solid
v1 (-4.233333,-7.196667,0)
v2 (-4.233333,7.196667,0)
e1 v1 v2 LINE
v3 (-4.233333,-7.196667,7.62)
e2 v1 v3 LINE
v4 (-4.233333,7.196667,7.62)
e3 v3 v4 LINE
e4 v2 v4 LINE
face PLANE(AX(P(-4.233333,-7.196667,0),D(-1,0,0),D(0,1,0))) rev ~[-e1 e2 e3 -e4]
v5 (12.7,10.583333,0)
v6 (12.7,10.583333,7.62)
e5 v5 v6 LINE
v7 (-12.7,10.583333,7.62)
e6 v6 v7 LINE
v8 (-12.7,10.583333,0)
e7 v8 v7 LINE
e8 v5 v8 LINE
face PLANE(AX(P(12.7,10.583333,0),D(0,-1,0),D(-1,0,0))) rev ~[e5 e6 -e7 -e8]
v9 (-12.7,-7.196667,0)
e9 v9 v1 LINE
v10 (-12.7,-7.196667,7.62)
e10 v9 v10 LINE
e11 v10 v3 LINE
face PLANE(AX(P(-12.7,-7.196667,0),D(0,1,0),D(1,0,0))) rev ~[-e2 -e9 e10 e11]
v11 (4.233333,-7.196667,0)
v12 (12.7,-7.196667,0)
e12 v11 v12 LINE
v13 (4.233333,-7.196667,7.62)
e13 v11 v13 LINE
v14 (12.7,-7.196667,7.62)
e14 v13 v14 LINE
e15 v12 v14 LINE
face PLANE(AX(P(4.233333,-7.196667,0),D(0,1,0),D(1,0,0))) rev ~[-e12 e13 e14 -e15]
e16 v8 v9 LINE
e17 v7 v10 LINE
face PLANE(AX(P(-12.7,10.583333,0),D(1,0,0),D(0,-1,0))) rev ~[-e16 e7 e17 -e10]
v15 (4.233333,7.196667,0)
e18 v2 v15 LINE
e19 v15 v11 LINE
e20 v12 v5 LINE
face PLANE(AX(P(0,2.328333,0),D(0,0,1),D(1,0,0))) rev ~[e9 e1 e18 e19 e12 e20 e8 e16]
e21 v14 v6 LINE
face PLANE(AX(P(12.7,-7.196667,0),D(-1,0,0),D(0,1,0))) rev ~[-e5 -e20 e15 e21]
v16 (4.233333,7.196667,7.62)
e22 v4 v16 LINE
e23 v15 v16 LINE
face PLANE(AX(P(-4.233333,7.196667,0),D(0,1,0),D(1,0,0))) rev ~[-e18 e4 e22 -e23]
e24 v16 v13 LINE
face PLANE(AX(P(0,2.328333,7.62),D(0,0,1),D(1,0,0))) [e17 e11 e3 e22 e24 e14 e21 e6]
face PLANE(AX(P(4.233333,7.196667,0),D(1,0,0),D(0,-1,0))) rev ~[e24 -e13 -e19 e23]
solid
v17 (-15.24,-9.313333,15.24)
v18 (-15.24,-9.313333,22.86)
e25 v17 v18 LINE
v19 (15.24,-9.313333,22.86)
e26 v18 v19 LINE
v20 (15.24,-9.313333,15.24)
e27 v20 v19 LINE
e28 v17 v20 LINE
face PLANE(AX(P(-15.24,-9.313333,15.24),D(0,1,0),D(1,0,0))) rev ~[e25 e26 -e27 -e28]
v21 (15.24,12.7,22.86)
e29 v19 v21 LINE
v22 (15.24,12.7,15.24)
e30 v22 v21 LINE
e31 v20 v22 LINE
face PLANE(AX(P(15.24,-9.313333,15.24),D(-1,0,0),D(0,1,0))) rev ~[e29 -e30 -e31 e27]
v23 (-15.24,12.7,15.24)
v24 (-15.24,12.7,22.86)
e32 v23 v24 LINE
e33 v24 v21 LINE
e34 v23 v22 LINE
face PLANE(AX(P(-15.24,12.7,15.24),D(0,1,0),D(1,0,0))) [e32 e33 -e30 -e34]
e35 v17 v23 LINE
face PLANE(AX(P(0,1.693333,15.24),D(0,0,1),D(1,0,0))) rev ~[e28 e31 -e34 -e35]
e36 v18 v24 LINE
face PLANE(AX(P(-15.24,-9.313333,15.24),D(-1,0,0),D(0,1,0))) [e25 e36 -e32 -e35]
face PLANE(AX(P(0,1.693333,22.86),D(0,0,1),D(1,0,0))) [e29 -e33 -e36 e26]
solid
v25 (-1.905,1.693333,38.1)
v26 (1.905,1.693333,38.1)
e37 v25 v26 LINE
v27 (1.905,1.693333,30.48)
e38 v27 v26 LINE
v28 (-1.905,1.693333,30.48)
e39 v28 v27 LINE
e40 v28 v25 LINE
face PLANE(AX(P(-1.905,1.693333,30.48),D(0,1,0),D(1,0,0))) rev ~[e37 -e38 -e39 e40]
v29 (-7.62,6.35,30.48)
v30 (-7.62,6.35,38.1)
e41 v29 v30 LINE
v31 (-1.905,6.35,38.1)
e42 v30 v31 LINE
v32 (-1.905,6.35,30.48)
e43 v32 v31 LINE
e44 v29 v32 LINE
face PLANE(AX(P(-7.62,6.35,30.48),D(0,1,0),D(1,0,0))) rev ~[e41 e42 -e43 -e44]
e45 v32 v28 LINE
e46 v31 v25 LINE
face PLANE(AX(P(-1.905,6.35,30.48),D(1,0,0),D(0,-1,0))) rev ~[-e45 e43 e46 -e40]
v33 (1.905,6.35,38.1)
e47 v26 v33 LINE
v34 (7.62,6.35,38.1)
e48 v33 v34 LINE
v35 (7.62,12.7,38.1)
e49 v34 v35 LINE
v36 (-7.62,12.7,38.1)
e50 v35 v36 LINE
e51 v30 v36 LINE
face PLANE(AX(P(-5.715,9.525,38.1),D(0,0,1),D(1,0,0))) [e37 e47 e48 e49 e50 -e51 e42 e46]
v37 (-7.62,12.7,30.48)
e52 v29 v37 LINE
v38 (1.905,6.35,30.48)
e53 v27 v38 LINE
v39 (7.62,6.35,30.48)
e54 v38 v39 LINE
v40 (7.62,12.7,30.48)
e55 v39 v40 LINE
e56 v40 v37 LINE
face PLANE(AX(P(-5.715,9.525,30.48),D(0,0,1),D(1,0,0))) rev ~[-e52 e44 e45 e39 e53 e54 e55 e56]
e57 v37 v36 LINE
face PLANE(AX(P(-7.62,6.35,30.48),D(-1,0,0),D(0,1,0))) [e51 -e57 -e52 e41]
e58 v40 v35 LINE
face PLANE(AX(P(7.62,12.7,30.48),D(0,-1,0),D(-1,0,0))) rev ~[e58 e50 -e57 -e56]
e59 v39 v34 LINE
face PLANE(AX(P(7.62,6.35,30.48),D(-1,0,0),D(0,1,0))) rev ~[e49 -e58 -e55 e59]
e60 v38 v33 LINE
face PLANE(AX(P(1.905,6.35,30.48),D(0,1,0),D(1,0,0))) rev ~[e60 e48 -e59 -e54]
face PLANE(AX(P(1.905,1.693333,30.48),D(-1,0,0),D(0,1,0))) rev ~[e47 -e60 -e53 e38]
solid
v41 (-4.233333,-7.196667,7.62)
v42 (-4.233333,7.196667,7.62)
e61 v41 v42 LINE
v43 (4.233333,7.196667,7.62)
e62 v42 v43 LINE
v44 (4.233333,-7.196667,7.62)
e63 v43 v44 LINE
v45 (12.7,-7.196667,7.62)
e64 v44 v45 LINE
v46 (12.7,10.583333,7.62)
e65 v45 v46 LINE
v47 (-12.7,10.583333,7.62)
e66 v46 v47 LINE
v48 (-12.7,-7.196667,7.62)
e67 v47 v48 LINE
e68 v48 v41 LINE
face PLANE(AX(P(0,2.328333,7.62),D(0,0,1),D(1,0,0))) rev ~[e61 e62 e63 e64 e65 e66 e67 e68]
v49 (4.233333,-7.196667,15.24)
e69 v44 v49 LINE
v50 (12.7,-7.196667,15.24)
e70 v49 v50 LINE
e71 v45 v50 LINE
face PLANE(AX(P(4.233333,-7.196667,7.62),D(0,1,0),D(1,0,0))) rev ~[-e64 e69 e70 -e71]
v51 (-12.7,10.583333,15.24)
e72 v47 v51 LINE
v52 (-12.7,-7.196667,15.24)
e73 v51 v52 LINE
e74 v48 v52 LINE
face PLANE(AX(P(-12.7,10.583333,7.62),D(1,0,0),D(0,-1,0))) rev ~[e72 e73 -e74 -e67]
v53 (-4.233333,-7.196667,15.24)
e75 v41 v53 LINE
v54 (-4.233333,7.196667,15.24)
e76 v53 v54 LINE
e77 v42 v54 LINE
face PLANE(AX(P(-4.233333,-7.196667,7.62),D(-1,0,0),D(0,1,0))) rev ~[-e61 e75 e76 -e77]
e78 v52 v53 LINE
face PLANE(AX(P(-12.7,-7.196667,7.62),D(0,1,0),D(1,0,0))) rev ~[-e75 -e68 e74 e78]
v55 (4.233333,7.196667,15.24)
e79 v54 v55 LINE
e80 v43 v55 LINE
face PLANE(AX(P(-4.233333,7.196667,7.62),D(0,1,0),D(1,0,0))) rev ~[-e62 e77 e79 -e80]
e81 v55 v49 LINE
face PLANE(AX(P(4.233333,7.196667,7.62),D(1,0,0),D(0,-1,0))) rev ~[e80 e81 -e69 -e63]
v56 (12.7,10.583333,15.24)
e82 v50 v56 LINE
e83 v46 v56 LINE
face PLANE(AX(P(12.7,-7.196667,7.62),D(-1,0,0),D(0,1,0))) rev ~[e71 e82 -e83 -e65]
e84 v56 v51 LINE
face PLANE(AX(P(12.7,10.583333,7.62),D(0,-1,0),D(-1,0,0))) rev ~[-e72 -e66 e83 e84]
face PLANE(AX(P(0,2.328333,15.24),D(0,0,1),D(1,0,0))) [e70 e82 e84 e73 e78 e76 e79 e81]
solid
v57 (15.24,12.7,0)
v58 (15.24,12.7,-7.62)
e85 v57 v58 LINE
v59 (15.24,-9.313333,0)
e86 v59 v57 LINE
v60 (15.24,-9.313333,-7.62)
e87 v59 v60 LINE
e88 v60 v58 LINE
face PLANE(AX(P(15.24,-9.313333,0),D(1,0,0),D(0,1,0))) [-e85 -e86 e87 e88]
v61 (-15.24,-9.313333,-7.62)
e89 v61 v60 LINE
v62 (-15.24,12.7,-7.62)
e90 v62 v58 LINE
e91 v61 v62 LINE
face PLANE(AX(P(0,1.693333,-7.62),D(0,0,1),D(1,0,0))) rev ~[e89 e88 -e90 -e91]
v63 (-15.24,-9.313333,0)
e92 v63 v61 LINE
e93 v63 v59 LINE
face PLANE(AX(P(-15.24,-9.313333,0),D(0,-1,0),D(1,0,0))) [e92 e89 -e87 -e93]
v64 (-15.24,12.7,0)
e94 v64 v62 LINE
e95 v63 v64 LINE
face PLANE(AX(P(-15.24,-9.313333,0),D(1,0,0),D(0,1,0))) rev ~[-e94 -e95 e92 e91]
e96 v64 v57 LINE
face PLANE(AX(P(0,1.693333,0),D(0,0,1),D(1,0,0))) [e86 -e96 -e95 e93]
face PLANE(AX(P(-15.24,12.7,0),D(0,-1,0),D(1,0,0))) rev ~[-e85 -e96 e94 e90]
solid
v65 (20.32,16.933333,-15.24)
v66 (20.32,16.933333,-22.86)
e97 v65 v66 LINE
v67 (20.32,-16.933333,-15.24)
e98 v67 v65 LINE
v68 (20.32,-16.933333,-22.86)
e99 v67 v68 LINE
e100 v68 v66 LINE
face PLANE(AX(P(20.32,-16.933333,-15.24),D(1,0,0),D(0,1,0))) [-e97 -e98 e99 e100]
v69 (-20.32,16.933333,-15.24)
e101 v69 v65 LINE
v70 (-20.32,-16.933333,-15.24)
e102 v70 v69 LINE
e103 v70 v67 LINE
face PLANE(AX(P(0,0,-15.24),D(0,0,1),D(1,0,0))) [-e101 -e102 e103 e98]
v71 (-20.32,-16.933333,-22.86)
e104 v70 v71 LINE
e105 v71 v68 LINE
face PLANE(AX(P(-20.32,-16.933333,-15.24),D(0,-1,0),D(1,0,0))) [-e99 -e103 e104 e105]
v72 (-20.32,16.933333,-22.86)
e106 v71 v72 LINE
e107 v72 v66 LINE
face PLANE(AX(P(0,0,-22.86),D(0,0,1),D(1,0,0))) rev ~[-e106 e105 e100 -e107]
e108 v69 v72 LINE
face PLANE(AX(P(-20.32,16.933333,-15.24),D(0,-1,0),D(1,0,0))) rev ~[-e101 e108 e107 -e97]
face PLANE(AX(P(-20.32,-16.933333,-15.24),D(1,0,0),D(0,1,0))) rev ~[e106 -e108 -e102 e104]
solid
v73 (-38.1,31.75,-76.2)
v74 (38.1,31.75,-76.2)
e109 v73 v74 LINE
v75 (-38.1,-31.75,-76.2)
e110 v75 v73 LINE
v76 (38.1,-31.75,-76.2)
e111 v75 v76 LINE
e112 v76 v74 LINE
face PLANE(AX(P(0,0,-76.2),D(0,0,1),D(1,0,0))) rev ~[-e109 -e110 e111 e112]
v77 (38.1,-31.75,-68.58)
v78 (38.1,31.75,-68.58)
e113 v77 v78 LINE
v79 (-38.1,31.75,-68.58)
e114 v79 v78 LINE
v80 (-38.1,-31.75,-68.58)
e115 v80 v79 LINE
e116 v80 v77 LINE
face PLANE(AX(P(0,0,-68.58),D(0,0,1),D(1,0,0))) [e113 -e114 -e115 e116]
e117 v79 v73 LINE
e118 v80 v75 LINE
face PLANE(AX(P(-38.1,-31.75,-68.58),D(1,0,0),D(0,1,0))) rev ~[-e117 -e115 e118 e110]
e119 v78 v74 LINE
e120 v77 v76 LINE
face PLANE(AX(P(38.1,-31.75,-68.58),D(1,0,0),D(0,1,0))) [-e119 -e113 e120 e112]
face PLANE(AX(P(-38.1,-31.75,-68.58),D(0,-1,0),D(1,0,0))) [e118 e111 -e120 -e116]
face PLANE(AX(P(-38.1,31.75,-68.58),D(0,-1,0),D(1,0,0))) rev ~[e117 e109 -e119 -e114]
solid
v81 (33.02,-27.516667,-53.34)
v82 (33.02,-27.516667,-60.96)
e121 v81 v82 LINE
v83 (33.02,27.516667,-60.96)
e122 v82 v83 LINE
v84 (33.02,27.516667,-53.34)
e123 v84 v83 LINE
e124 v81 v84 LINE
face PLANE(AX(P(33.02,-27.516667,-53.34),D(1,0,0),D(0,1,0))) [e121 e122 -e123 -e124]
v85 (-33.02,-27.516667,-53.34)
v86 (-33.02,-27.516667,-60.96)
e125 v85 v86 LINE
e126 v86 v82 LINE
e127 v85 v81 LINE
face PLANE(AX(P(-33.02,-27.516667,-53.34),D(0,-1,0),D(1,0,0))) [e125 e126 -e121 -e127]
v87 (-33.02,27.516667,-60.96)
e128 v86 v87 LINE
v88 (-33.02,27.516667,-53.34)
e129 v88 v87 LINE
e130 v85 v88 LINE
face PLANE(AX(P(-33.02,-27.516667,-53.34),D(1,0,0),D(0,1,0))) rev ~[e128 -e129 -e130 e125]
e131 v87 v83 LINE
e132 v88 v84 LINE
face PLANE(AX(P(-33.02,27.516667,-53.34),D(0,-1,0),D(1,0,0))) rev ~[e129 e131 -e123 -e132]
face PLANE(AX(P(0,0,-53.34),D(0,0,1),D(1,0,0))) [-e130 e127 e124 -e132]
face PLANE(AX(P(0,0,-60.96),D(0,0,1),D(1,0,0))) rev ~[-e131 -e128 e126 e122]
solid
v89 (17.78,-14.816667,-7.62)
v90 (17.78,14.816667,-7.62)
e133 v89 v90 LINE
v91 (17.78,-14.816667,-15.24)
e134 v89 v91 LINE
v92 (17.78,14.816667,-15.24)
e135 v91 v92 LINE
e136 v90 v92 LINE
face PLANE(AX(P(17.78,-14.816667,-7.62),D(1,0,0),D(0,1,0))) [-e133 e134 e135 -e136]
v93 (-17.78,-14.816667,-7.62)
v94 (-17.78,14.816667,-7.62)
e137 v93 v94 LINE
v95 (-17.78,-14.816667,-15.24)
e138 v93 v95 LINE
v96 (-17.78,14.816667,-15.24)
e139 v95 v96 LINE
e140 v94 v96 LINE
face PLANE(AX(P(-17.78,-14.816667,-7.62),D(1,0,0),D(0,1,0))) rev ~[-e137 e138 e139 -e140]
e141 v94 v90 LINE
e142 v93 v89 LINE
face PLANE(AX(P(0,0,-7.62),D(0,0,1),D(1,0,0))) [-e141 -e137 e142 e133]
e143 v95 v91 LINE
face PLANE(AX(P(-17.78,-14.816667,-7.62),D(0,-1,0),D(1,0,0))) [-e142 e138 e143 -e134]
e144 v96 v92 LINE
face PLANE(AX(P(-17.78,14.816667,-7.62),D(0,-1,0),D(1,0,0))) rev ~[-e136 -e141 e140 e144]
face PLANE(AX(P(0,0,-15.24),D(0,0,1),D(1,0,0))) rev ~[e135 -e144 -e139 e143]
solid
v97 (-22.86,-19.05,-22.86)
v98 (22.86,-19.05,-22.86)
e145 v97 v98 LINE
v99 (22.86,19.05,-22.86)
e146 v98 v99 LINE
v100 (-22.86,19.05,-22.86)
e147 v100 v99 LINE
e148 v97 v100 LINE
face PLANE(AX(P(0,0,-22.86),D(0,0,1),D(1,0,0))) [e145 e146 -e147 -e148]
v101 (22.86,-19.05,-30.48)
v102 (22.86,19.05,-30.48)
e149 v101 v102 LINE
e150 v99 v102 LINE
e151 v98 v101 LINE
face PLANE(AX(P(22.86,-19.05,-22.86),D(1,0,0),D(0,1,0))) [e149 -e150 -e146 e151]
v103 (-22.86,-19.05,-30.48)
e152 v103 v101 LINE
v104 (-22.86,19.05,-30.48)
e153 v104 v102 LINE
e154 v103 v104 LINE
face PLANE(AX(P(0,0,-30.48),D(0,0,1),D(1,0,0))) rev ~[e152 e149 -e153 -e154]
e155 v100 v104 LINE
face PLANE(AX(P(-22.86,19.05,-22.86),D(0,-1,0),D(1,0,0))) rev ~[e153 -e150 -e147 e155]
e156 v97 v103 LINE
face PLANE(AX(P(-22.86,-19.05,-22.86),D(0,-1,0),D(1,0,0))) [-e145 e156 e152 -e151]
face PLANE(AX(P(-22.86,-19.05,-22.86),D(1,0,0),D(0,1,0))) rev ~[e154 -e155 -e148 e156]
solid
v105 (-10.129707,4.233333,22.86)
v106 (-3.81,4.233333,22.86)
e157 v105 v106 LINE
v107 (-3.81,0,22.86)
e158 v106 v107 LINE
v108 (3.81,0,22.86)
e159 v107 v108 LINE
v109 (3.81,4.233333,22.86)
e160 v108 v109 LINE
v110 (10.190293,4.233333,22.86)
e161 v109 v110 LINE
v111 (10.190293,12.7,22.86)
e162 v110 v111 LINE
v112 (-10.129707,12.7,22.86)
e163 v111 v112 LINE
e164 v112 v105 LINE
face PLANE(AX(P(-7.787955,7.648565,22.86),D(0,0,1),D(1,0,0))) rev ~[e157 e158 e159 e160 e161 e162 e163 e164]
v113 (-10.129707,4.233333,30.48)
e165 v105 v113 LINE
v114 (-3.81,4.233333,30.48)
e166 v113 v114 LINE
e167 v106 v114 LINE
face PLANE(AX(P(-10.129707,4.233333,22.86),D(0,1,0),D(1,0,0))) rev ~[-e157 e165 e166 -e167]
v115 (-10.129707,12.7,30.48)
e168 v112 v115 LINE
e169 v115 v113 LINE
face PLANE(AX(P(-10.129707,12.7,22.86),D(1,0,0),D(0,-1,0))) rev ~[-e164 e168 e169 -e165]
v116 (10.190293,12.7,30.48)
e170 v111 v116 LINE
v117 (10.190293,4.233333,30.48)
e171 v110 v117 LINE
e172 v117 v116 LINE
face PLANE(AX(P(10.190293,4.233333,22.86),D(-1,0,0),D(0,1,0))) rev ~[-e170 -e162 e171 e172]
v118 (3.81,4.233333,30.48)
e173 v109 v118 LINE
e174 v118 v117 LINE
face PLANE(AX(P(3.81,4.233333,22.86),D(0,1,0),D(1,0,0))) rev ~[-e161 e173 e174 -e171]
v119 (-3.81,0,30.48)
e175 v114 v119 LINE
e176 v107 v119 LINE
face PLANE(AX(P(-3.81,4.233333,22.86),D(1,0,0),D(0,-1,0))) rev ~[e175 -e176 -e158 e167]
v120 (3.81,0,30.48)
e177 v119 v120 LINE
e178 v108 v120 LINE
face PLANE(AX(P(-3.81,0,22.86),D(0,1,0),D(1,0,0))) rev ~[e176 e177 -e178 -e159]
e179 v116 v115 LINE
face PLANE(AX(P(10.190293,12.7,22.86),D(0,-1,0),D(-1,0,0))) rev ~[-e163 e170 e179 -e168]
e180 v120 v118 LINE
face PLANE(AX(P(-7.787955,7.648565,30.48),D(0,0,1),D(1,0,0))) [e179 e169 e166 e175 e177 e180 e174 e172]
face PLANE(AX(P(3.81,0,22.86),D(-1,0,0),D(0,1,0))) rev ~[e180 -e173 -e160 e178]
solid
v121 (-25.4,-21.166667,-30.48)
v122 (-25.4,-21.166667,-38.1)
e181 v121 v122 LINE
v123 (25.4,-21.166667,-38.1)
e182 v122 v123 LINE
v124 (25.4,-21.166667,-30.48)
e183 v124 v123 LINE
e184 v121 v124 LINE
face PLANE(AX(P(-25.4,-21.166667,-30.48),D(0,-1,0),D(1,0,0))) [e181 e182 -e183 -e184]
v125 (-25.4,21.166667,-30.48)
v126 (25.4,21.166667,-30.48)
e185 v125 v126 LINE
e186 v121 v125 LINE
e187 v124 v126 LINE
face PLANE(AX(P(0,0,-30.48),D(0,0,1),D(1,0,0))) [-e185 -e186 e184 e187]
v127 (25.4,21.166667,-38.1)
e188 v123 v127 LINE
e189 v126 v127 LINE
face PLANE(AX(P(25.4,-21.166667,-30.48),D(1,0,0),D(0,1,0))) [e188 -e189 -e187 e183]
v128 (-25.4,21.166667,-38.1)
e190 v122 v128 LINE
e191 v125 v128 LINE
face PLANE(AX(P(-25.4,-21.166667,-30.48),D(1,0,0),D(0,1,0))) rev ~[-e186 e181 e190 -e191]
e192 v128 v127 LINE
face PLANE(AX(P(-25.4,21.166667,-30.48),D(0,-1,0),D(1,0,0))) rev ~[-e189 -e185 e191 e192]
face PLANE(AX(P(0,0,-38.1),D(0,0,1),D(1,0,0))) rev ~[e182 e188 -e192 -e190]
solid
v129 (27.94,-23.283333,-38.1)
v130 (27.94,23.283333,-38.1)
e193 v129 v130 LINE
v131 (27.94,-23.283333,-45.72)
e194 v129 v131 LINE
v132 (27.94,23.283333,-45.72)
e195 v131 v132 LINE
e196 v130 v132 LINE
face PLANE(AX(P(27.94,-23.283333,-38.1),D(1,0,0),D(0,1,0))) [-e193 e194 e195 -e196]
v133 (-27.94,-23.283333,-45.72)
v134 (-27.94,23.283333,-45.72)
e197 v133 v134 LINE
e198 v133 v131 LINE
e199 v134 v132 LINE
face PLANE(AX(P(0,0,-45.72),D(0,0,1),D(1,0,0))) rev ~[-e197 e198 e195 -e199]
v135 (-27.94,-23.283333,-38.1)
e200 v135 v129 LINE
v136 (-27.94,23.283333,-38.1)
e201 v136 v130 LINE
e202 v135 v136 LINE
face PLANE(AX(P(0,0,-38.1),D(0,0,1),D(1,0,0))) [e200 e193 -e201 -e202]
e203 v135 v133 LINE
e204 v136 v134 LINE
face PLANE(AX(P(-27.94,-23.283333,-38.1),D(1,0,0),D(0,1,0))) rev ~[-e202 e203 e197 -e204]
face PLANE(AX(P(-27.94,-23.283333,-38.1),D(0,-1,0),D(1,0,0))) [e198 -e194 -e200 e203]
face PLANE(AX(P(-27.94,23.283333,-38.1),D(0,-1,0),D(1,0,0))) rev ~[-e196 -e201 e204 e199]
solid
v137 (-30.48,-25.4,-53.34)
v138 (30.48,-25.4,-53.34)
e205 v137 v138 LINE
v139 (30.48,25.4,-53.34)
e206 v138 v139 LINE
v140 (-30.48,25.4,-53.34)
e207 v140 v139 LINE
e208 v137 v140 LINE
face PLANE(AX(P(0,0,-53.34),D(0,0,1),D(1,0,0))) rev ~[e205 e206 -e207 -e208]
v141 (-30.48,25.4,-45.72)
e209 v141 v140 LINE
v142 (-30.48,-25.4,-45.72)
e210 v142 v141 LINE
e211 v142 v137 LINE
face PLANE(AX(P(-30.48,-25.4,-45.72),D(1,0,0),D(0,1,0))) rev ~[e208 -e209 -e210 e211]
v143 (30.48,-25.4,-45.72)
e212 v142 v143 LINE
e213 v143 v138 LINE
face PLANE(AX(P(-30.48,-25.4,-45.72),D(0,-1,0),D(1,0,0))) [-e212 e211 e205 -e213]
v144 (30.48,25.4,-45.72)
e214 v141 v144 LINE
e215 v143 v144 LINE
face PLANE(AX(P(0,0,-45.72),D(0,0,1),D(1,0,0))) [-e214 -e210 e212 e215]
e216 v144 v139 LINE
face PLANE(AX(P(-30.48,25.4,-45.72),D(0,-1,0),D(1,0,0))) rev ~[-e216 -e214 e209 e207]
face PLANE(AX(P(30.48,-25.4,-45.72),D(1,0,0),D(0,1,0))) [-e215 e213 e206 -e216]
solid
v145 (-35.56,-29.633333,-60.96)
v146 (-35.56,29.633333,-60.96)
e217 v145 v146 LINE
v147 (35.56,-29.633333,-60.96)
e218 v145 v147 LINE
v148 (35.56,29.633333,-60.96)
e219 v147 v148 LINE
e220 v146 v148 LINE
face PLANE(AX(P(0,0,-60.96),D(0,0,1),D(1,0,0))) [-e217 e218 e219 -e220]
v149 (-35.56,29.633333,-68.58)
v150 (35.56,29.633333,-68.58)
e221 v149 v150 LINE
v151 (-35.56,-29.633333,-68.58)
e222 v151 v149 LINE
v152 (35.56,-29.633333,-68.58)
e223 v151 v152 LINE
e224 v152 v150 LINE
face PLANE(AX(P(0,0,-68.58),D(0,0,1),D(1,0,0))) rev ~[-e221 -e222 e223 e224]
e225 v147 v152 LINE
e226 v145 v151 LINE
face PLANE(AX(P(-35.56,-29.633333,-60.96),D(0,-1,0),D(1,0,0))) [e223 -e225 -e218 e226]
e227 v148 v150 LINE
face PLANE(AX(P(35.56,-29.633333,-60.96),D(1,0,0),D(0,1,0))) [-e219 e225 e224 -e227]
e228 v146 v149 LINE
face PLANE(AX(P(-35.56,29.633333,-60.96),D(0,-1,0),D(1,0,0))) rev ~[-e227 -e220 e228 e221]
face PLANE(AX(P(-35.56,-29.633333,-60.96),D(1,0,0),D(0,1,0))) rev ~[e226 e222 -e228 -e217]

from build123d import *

# Parameters (mm, degrees)
F1_START  = -68.58
F0_W      = 76.2
F0_H      = 63.5
F0_W_2    = 71.12
F0_H_2    = 59.2666666667
F0_W_3    = 66.04
F0_H_3    = 55.0333333333
F0_W_4    = 60.96
F0_H_4    = 50.8
F0_W_5    = 55.88
F0_H_5    = 46.5666666667
F0_W_6    = 50.8
F0_H_6    = 42.3333333333
F0_W_7    = 45.72
F0_H_7    = 38.1
F0_W_8    = 40.64
F0_H_8    = 33.8666666667
F0_W_9    = 35.56
F0_H_9    = 29.6333333333
F0_W_10   = 30.48
F0_H_10   = 22.0133333333
F0_W_11   = 8.4666666667
F0_H_11   = 14.3933333333
F1_DEPTH  = 7.62
F2_START  = -60.96
F2_DEPTH  = 7.62
F3_START  = -53.34
F3_DEPTH  = 7.62
F4_START  = -45.72
F4_DEPTH  = 7.62
F5_START  = -38.1
F5_DEPTH  = 7.62
F6_START  = -30.48
F6_DEPTH  = 7.62
F7_START  = -22.86
F7_DEPTH  = 7.62
F8_START  = -15.24
F8_DEPTH  = 7.62
F9_START  = -7.62
F9_DEPTH  = 7.62
F10_DEPTH = 7.62
F11_DEPTH = 7.62
F12_START = 15.24
F12_DEPTH = 7.62
F13_W     = 1.905
F13_H     = 2.1166666667
F13_W_2   = 3.81
F13_H_2   = 6.35
F13_H_3   = 2.54
F14_DEPTH = 7.62
F15_START = 7.62
F15_DEPTH = 7.62
F16_START = 7.62
F16_DEPTH = 7.62


# Not quite as in the source:
# - a feature names something its author has since deleted; it is built from what else it names


with BuildPart() as f1:
    # F0 (on Top) → F1 (new body)
    with BuildSketch(Plane.XY.offset(F1_START)):
        Rectangle(F0_W, F0_H)
        Rectangle(F0_W_2, F0_H_2, mode=Mode.SUBTRACT)
        Rectangle(F0_W_2, F0_H_2)
        Rectangle(F0_W_3, F0_H_3, mode=Mode.SUBTRACT)
        Rectangle(F0_W_3, F0_H_3)
        Rectangle(F0_W_4, F0_H_4, mode=Mode.SUBTRACT)
        Rectangle(F0_W_4, F0_H_4)
        Rectangle(F0_W_5, F0_H_5, mode=Mode.SUBTRACT)
        Rectangle(F0_W_5, F0_H_5)
        Rectangle(F0_W_6, F0_H_6, mode=Mode.SUBTRACT)
        Rectangle(F0_W_6, F0_H_6)
        Rectangle(F0_W_7, F0_H_7, mode=Mode.SUBTRACT)
        Rectangle(F0_W_7, F0_H_7)
        Rectangle(F0_W_8, F0_H_8, mode=Mode.SUBTRACT)
        Rectangle(F0_W_8, F0_H_8)
        Rectangle(F0_W_9, F0_H_9, mode=Mode.SUBTRACT)
        Rectangle(F0_W_9, F0_H_9)
        with Locations((0, 1.6933333333)):
            Rectangle(F0_W_10, F0_H_10, mode=Mode.SUBTRACT)
        with Locations((0, 1.6933333333)):
            Rectangle(F0_W_10, F0_H_10)
        Polygon((-12.7, -7.1966666667), (-12.7, 10.5833333333), (12.7, 10.5833333333), (12.7, -7.1966666667), (4.2333333333, -7.1966666667), (-4.2333333333, -7.1966666667), align=None, mode=Mode.SUBTRACT)
        Polygon((12.7, 10.5833333333), (-12.7, 10.5833333333), (-12.7, -7.1966666667), (-4.2333333333, -7.1966666667), (-4.2333333333, 7.1966666667), (4.2333333333, 7.1966666667), (4.2333333333, -7.1966666667), (12.7, -7.1966666667), align=None)
        Rectangle(F0_W_11, F0_H_11)
    extrude(amount=-F1_DEPTH)


with BuildPart() as f2:
    # F0 (on Top) → F2 (new body)
    with BuildSketch(Plane.XY.offset(F2_START)):
        Rectangle(F0_W_2, F0_H_2)
        Rectangle(F0_W_3, F0_H_3, mode=Mode.SUBTRACT)
        Rectangle(F0_W_3, F0_H_3)
        Rectangle(F0_W_4, F0_H_4, mode=Mode.SUBTRACT)
        Rectangle(F0_W_4, F0_H_4)
        Rectangle(F0_W_5, F0_H_5, mode=Mode.SUBTRACT)
        Rectangle(F0_W_5, F0_H_5)
        Rectangle(F0_W_6, F0_H_6, mode=Mode.SUBTRACT)
        Rectangle(F0_W_6, F0_H_6)
        Rectangle(F0_W_7, F0_H_7, mode=Mode.SUBTRACT)
        Rectangle(F0_W_7, F0_H_7)
        Rectangle(F0_W_8, F0_H_8, mode=Mode.SUBTRACT)
        Rectangle(F0_W_8, F0_H_8)
        Rectangle(F0_W_9, F0_H_9, mode=Mode.SUBTRACT)
        Rectangle(F0_W_9, F0_H_9)
        with Locations((0, 1.6933333333)):
            Rectangle(F0_W_10, F0_H_10, mode=Mode.SUBTRACT)
        with Locations((0, 1.6933333333)):
            Rectangle(F0_W_10, F0_H_10)
        Polygon((-12.7, -7.1966666667), (-12.7, 10.5833333333), (12.7, 10.5833333333), (12.7, -7.1966666667), (4.2333333333, -7.1966666667), (-4.2333333333, -7.1966666667), align=None, mode=Mode.SUBTRACT)
        Polygon((12.7, 10.5833333333), (-12.7, 10.5833333333), (-12.7, -7.1966666667), (-4.2333333333, -7.1966666667), (-4.2333333333, 7.1966666667), (4.2333333333, 7.1966666667), (4.2333333333, -7.1966666667), (12.7, -7.1966666667), align=None)
        Rectangle(F0_W_11, F0_H_11)
    extrude(amount=-F2_DEPTH)


with BuildPart() as f3:
    # F0 (on Top) → F3 (new body)
    with BuildSketch(Plane.XY.offset(F3_START)):
        Rectangle(F0_W_3, F0_H_3)
        Rectangle(F0_W_4, F0_H_4, mode=Mode.SUBTRACT)
        Rectangle(F0_W_4, F0_H_4)
        Rectangle(F0_W_5, F0_H_5, mode=Mode.SUBTRACT)
        Rectangle(F0_W_5, F0_H_5)
        Rectangle(F0_W_6, F0_H_6, mode=Mode.SUBTRACT)
        Rectangle(F0_W_6, F0_H_6)
        Rectangle(F0_W_7, F0_H_7, mode=Mode.SUBTRACT)
        Rectangle(F0_W_7, F0_H_7)
        Rectangle(F0_W_8, F0_H_8, mode=Mode.SUBTRACT)
        Rectangle(F0_W_8, F0_H_8)
        Rectangle(F0_W_9, F0_H_9, mode=Mode.SUBTRACT)
        Rectangle(F0_W_9, F0_H_9)
        with Locations((0, 1.6933333333)):
            Rectangle(F0_W_10, F0_H_10, mode=Mode.SUBTRACT)
        with Locations((0, 1.6933333333)):
            Rectangle(F0_W_10, F0_H_10)
        Polygon((-12.7, -7.1966666667), (-12.7, 10.5833333333), (12.7, 10.5833333333), (12.7, -7.1966666667), (4.2333333333, -7.1966666667), (-4.2333333333, -7.1966666667), align=None, mode=Mode.SUBTRACT)
        Polygon((12.7, 10.5833333333), (-12.7, 10.5833333333), (-12.7, -7.1966666667), (-4.2333333333, -7.1966666667), (-4.2333333333, 7.1966666667), (4.2333333333, 7.1966666667), (4.2333333333, -7.1966666667), (12.7, -7.1966666667), align=None)
        Rectangle(F0_W_11, F0_H_11)
    extrude(amount=-F3_DEPTH)


with BuildPart() as f4:
    # F0 (on Top) → F4 (new body)
    with BuildSketch(Plane.XY.offset(F4_START)):
        Rectangle(F0_W_4, F0_H_4)
        Rectangle(F0_W_5, F0_H_5, mode=Mode.SUBTRACT)
        Rectangle(F0_W_5, F0_H_5)
        Rectangle(F0_W_6, F0_H_6, mode=Mode.SUBTRACT)
        Rectangle(F0_W_6, F0_H_6)
        Rectangle(F0_W_7, F0_H_7, mode=Mode.SUBTRACT)
        Rectangle(F0_W_7, F0_H_7)
        Rectangle(F0_W_8, F0_H_8, mode=Mode.SUBTRACT)
        Rectangle(F0_W_8, F0_H_8)
        Rectangle(F0_W_9, F0_H_9, mode=Mode.SUBTRACT)
        Rectangle(F0_W_9, F0_H_9)
        with Locations((0, 1.6933333333)):
            Rectangle(F0_W_10, F0_H_10, mode=Mode.SUBTRACT)
        with Locations((0, 1.6933333333)):
            Rectangle(F0_W_10, F0_H_10)
        Polygon((-12.7, -7.1966666667), (-12.7, 10.5833333333), (12.7, 10.5833333333), (12.7, -7.1966666667), (4.2333333333, -7.1966666667), (-4.2333333333, -7.1966666667), align=None, mode=Mode.SUBTRACT)
        Polygon((12.7, 10.5833333333), (-12.7, 10.5833333333), (-12.7, -7.1966666667), (-4.2333333333, -7.1966666667), (-4.2333333333, 7.1966666667), (4.2333333333, 7.1966666667), (4.2333333333, -7.1966666667), (12.7, -7.1966666667), align=None)
        Rectangle(F0_W_11, F0_H_11)
    extrude(amount=-F4_DEPTH)


with BuildPart() as f5:
    # F0 (on Top) → F5 (new body)
    with BuildSketch(Plane.XY.offset(F5_START)):
        Rectangle(F0_W_5, F0_H_5)
        Rectangle(F0_W_6, F0_H_6, mode=Mode.SUBTRACT)
        Rectangle(F0_W_6, F0_H_6)
        Rectangle(F0_W_7, F0_H_7, mode=Mode.SUBTRACT)
        Rectangle(F0_W_7, F0_H_7)
        Rectangle(F0_W_8, F0_H_8, mode=Mode.SUBTRACT)
        Rectangle(F0_W_8, F0_H_8)
        Rectangle(F0_W_9, F0_H_9, mode=Mode.SUBTRACT)
        Rectangle(F0_W_9, F0_H_9)
        with Locations((0, 1.6933333333)):
            Rectangle(F0_W_10, F0_H_10, mode=Mode.SUBTRACT)
        with Locations((0, 1.6933333333)):
            Rectangle(F0_W_10, F0_H_10)
        Polygon((-12.7, -7.1966666667), (-12.7, 10.5833333333), (12.7, 10.5833333333), (12.7, -7.1966666667), (4.2333333333, -7.1966666667), (-4.2333333333, -7.1966666667), align=None, mode=Mode.SUBTRACT)
        Rectangle(F0_W_11, F0_H_11)
        Polygon((12.7, 10.5833333333), (-12.7, 10.5833333333), (-12.7, -7.1966666667), (-4.2333333333, -7.1966666667), (-4.2333333333, 7.1966666667), (4.2333333333, 7.1966666667), (4.2333333333, -7.1966666667), (12.7, -7.1966666667), align=None)
    extrude(amount=-F5_DEPTH)


with BuildPart() as f6:
    # F0 (on Top) → F6 (new body)
    with BuildSketch(Plane.XY.offset(F6_START)):
        Rectangle(F0_W_6, F0_H_6)
        Rectangle(F0_W_7, F0_H_7, mode=Mode.SUBTRACT)
        Rectangle(F0_W_7, F0_H_7)
        Rectangle(F0_W_8, F0_H_8, mode=Mode.SUBTRACT)
        Rectangle(F0_W_8, F0_H_8)
        Rectangle(F0_W_9, F0_H_9, mode=Mode.SUBTRACT)
        Rectangle(F0_W_9, F0_H_9)
        with Locations((0, 1.6933333333)):
            Rectangle(F0_W_10, F0_H_10, mode=Mode.SUBTRACT)
        with Locations((0, 1.6933333333)):
            Rectangle(F0_W_10, F0_H_10)
        Polygon((-12.7, -7.1966666667), (-12.7, 10.5833333333), (12.7, 10.5833333333), (12.7, -7.1966666667), (4.2333333333, -7.1966666667), (-4.2333333333, -7.1966666667), align=None, mode=Mode.SUBTRACT)
        Polygon((12.7, 10.5833333333), (-12.7, 10.5833333333), (-12.7, -7.1966666667), (-4.2333333333, -7.1966666667), (-4.2333333333, 7.1966666667), (4.2333333333, 7.1966666667), (4.2333333333, -7.1966666667), (12.7, -7.1966666667), align=None)
        Rectangle(F0_W_11, F0_H_11)
    extrude(amount=-F6_DEPTH)


with BuildPart() as f7:
    # F0 (on Top) → F7 (new body)
    with BuildSketch(Plane.XY.offset(F7_START)):
        Rectangle(F0_W_7, F0_H_7)
        Rectangle(F0_W_8, F0_H_8, mode=Mode.SUBTRACT)
        Rectangle(F0_W_8, F0_H_8)
        Rectangle(F0_W_9, F0_H_9, mode=Mode.SUBTRACT)
        Rectangle(F0_W_9, F0_H_9)
        with Locations((0, 1.6933333333)):
            Rectangle(F0_W_10, F0_H_10, mode=Mode.SUBTRACT)
        with Locations((0, 1.6933333333)):
            Rectangle(F0_W_10, F0_H_10)
        Polygon((-12.7, -7.1966666667), (-12.7, 10.5833333333), (12.7, 10.5833333333), (12.7, -7.1966666667), (4.2333333333, -7.1966666667), (-4.2333333333, -7.1966666667), align=None, mode=Mode.SUBTRACT)
        Polygon((12.7, 10.5833333333), (-12.7, 10.5833333333), (-12.7, -7.1966666667), (-4.2333333333, -7.1966666667), (-4.2333333333, 7.1966666667), (4.2333333333, 7.1966666667), (4.2333333333, -7.1966666667), (12.7, -7.1966666667), align=None)
        Rectangle(F0_W_11, F0_H_11)
    extrude(amount=-F7_DEPTH)


with BuildPart() as f8:
    # F0 (on Top) → F8 (new body)
    with BuildSketch(Plane.XY.offset(F8_START)):
        Rectangle(F0_W_8, F0_H_8)
        Rectangle(F0_W_9, F0_H_9, mode=Mode.SUBTRACT)
        Rectangle(F0_W_9, F0_H_9)
        with Locations((0, 1.6933333333)):
            Rectangle(F0_W_10, F0_H_10, mode=Mode.SUBTRACT)
        with Locations((0, 1.6933333333)):
            Rectangle(F0_W_10, F0_H_10)
        Polygon((-12.7, -7.1966666667), (-12.7, 10.5833333333), (12.7, 10.5833333333), (12.7, -7.1966666667), (4.2333333333, -7.1966666667), (-4.2333333333, -7.1966666667), align=None, mode=Mode.SUBTRACT)
        Polygon((12.7, 10.5833333333), (-12.7, 10.5833333333), (-12.7, -7.1966666667), (-4.2333333333, -7.1966666667), (-4.2333333333, 7.1966666667), (4.2333333333, 7.1966666667), (4.2333333333, -7.1966666667), (12.7, -7.1966666667), align=None)
        Rectangle(F0_W_11, F0_H_11)
    extrude(amount=-F8_DEPTH)


with BuildPart() as f9:
    # F0 (on Top) → F9 (new body)
    with BuildSketch(Plane.XY.offset(F9_START)):
        Rectangle(F0_W_9, F0_H_9)
        with Locations((0, 1.6933333333)):
            Rectangle(F0_W_10, F0_H_10, mode=Mode.SUBTRACT)
        with Locations((0, 1.6933333333)):
            Rectangle(F0_W_10, F0_H_10)
        Polygon((-12.7, -7.1966666667), (-12.7, 10.5833333333), (12.7, 10.5833333333), (12.7, -7.1966666667), (4.2333333333, -7.1966666667), (-4.2333333333, -7.1966666667), align=None, mode=Mode.SUBTRACT)
        Polygon((12.7, 10.5833333333), (-12.7, 10.5833333333), (-12.7, -7.1966666667), (-4.2333333333, -7.1966666667), (-4.2333333333, 7.1966666667), (4.2333333333, 7.1966666667), (4.2333333333, -7.1966666667), (12.7, -7.1966666667), align=None)
        Rectangle(F0_W_11, F0_H_11)
    extrude(amount=-F9_DEPTH)


with BuildPart() as f10:
    # F0 (on Top) → F10 (new body)
    with BuildSketch(Plane.XY):
        with Locations((0, 1.6933333333)):
            Rectangle(F0_W_10, F0_H_10)
        Polygon((-12.7, -7.1966666667), (-12.7, 10.5833333333), (12.7, 10.5833333333), (12.7, -7.1966666667), (4.2333333333, -7.1966666667), (-4.2333333333, -7.1966666667), align=None, mode=Mode.SUBTRACT)
        Polygon((12.7, 10.5833333333), (-12.7, 10.5833333333), (-12.7, -7.1966666667), (-4.2333333333, -7.1966666667), (-4.2333333333, 7.1966666667), (4.2333333333, 7.1966666667), (4.2333333333, -7.1966666667), (12.7, -7.1966666667), align=None)
        Rectangle(F0_W_11, F0_H_11)
    extrude(amount=-F10_DEPTH)


with BuildPart() as f11:
    # F0 (on Top) → F11 (new body)
    with BuildSketch(Plane.XY):
        Polygon((12.7, 10.5833333333), (-12.7, 10.5833333333), (-12.7, -7.1966666667), (-4.2333333333, -7.1966666667), (-4.2333333333, 7.1966666667), (4.2333333333, 7.1966666667), (4.2333333333, -7.1966666667), (12.7, -7.1966666667), align=None)
    extrude(amount=F11_DEPTH)


with BuildPart() as f12:
    # F0 (on Top) → F12 (new body)
    with BuildSketch(Plane.XY.offset(F12_START)):
        with Locations((0, 1.6933333333)):
            Rectangle(F0_W_10, F0_H_10)
        Polygon((-12.7, -7.1966666667), (-12.7, 10.5833333333), (12.7, 10.5833333333), (12.7, -7.1966666667), (4.2333333333, -7.1966666667), (-4.2333333333, -7.1966666667), align=None, mode=Mode.SUBTRACT)
        Polygon((12.7, 10.5833333333), (-12.7, 10.5833333333), (-12.7, -7.1966666667), (-4.2333333333, -7.1966666667), (-4.2333333333, 7.1966666667), (4.2333333333, 7.1966666667), (4.2333333333, -7.1966666667), (12.7, -7.1966666667), align=None)
        Rectangle(F0_W_11, F0_H_11)
    extrude(amount=F12_DEPTH)


with BuildPart() as f14:
    # F13 (on face) → F14 (new body)
    with BuildSketch(Plane.XY.offset(22.86)):
        Polygon((-7.62, 12.7), (-10.1297069341, 12.7), (-10.1297069341, 4.2333333333), (-3.81, 4.2333333333), (-3.81, 6.35), (-7.62, 6.35), align=None)
        with Locations((2.8575, 5.2916666667)):
            Rectangle(F13_W, F13_H)
        with Locations((-2.8575, 5.2916666667)):
            Rectangle(F13_W, F13_H)
        Polygon((-1.905, 4.2333333333), (-3.81, 4.2333333333), (-3.81, 0), (3.81, 0), (3.81, 4.2333333333), (1.905, 4.2333333333), (1.905, 1.6933333333), (-1.905, 1.6933333333), align=None)
        Polygon((3.81, 6.35), (3.81, 4.2333333333), (10.1902930659, 4.2333333333), (10.1902930659, 12.7), (7.62, 12.7), (7.62, 6.35), align=None)
        with Locations((5.715, 9.525)):
            Rectangle(F13_W_2, F13_H_2)
        with Locations((2.8575, 9.525)):
            Rectangle(F13_W, F13_H_2)
        with Locations((0, 9.525)):
            Rectangle(F13_W_2, F13_H_2)
        with Locations((0, 5.2916666667)):
            Rectangle(F13_W_2, F13_H)
        with Locations((0, 2.9633333333)):
            Rectangle(F13_W_2, F13_H_3)
        with Locations((-2.8575, 9.525)):
            Rectangle(F13_W, F13_H_2)
        with Locations((-5.715, 9.525)):
            Rectangle(F13_W_2, F13_H_2)
    extrude(amount=F14_DEPTH)


with BuildPart() as f15:
    # F13 (on face) → F15 (new body)
    with BuildSketch(Plane.XY.offset(22.86).offset(F15_START)):
        with Locations((-5.715, 9.525)):
            Rectangle(F13_W_2, F13_H_2)
        with Locations((-2.8575, 9.525)):
            Rectangle(F13_W, F13_H_2)
        with Locations((0, 9.525)):
            Rectangle(F13_W_2, F13_H_2)
        with Locations((2.8575, 9.525)):
            Rectangle(F13_W, F13_H_2)
        with Locations((5.715, 9.525)):
            Rectangle(F13_W_2, F13_H_2)
        with Locations((0, 5.2916666667)):
            Rectangle(F13_W_2, F13_H)
        with Locations((0, 2.9633333333)):
            Rectangle(F13_W_2, F13_H_3)
    extrude(amount=F15_DEPTH)


with BuildPart() as f16:
    # F0 (on Top) → F16 (new body)
    with BuildSketch(Plane.XY.offset(F16_START)):
        Polygon((12.7, 10.5833333333), (-12.7, 10.5833333333), (-12.7, -7.1966666667), (-4.2333333333, -7.1966666667), (-4.2333333333, 7.1966666667), (4.2333333333, 7.1966666667), (4.2333333333, -7.1966666667), (12.7, -7.1966666667), align=None)
    extrude(amount=F16_DEPTH)


solid = Compound([f1.part, f2.part, f3.part, f4.part, f5.part, f6.part, f7.part, f8.part, f9.part, f10.part, f11.part, f12.part, f14.part, f15.part, f16.part])
